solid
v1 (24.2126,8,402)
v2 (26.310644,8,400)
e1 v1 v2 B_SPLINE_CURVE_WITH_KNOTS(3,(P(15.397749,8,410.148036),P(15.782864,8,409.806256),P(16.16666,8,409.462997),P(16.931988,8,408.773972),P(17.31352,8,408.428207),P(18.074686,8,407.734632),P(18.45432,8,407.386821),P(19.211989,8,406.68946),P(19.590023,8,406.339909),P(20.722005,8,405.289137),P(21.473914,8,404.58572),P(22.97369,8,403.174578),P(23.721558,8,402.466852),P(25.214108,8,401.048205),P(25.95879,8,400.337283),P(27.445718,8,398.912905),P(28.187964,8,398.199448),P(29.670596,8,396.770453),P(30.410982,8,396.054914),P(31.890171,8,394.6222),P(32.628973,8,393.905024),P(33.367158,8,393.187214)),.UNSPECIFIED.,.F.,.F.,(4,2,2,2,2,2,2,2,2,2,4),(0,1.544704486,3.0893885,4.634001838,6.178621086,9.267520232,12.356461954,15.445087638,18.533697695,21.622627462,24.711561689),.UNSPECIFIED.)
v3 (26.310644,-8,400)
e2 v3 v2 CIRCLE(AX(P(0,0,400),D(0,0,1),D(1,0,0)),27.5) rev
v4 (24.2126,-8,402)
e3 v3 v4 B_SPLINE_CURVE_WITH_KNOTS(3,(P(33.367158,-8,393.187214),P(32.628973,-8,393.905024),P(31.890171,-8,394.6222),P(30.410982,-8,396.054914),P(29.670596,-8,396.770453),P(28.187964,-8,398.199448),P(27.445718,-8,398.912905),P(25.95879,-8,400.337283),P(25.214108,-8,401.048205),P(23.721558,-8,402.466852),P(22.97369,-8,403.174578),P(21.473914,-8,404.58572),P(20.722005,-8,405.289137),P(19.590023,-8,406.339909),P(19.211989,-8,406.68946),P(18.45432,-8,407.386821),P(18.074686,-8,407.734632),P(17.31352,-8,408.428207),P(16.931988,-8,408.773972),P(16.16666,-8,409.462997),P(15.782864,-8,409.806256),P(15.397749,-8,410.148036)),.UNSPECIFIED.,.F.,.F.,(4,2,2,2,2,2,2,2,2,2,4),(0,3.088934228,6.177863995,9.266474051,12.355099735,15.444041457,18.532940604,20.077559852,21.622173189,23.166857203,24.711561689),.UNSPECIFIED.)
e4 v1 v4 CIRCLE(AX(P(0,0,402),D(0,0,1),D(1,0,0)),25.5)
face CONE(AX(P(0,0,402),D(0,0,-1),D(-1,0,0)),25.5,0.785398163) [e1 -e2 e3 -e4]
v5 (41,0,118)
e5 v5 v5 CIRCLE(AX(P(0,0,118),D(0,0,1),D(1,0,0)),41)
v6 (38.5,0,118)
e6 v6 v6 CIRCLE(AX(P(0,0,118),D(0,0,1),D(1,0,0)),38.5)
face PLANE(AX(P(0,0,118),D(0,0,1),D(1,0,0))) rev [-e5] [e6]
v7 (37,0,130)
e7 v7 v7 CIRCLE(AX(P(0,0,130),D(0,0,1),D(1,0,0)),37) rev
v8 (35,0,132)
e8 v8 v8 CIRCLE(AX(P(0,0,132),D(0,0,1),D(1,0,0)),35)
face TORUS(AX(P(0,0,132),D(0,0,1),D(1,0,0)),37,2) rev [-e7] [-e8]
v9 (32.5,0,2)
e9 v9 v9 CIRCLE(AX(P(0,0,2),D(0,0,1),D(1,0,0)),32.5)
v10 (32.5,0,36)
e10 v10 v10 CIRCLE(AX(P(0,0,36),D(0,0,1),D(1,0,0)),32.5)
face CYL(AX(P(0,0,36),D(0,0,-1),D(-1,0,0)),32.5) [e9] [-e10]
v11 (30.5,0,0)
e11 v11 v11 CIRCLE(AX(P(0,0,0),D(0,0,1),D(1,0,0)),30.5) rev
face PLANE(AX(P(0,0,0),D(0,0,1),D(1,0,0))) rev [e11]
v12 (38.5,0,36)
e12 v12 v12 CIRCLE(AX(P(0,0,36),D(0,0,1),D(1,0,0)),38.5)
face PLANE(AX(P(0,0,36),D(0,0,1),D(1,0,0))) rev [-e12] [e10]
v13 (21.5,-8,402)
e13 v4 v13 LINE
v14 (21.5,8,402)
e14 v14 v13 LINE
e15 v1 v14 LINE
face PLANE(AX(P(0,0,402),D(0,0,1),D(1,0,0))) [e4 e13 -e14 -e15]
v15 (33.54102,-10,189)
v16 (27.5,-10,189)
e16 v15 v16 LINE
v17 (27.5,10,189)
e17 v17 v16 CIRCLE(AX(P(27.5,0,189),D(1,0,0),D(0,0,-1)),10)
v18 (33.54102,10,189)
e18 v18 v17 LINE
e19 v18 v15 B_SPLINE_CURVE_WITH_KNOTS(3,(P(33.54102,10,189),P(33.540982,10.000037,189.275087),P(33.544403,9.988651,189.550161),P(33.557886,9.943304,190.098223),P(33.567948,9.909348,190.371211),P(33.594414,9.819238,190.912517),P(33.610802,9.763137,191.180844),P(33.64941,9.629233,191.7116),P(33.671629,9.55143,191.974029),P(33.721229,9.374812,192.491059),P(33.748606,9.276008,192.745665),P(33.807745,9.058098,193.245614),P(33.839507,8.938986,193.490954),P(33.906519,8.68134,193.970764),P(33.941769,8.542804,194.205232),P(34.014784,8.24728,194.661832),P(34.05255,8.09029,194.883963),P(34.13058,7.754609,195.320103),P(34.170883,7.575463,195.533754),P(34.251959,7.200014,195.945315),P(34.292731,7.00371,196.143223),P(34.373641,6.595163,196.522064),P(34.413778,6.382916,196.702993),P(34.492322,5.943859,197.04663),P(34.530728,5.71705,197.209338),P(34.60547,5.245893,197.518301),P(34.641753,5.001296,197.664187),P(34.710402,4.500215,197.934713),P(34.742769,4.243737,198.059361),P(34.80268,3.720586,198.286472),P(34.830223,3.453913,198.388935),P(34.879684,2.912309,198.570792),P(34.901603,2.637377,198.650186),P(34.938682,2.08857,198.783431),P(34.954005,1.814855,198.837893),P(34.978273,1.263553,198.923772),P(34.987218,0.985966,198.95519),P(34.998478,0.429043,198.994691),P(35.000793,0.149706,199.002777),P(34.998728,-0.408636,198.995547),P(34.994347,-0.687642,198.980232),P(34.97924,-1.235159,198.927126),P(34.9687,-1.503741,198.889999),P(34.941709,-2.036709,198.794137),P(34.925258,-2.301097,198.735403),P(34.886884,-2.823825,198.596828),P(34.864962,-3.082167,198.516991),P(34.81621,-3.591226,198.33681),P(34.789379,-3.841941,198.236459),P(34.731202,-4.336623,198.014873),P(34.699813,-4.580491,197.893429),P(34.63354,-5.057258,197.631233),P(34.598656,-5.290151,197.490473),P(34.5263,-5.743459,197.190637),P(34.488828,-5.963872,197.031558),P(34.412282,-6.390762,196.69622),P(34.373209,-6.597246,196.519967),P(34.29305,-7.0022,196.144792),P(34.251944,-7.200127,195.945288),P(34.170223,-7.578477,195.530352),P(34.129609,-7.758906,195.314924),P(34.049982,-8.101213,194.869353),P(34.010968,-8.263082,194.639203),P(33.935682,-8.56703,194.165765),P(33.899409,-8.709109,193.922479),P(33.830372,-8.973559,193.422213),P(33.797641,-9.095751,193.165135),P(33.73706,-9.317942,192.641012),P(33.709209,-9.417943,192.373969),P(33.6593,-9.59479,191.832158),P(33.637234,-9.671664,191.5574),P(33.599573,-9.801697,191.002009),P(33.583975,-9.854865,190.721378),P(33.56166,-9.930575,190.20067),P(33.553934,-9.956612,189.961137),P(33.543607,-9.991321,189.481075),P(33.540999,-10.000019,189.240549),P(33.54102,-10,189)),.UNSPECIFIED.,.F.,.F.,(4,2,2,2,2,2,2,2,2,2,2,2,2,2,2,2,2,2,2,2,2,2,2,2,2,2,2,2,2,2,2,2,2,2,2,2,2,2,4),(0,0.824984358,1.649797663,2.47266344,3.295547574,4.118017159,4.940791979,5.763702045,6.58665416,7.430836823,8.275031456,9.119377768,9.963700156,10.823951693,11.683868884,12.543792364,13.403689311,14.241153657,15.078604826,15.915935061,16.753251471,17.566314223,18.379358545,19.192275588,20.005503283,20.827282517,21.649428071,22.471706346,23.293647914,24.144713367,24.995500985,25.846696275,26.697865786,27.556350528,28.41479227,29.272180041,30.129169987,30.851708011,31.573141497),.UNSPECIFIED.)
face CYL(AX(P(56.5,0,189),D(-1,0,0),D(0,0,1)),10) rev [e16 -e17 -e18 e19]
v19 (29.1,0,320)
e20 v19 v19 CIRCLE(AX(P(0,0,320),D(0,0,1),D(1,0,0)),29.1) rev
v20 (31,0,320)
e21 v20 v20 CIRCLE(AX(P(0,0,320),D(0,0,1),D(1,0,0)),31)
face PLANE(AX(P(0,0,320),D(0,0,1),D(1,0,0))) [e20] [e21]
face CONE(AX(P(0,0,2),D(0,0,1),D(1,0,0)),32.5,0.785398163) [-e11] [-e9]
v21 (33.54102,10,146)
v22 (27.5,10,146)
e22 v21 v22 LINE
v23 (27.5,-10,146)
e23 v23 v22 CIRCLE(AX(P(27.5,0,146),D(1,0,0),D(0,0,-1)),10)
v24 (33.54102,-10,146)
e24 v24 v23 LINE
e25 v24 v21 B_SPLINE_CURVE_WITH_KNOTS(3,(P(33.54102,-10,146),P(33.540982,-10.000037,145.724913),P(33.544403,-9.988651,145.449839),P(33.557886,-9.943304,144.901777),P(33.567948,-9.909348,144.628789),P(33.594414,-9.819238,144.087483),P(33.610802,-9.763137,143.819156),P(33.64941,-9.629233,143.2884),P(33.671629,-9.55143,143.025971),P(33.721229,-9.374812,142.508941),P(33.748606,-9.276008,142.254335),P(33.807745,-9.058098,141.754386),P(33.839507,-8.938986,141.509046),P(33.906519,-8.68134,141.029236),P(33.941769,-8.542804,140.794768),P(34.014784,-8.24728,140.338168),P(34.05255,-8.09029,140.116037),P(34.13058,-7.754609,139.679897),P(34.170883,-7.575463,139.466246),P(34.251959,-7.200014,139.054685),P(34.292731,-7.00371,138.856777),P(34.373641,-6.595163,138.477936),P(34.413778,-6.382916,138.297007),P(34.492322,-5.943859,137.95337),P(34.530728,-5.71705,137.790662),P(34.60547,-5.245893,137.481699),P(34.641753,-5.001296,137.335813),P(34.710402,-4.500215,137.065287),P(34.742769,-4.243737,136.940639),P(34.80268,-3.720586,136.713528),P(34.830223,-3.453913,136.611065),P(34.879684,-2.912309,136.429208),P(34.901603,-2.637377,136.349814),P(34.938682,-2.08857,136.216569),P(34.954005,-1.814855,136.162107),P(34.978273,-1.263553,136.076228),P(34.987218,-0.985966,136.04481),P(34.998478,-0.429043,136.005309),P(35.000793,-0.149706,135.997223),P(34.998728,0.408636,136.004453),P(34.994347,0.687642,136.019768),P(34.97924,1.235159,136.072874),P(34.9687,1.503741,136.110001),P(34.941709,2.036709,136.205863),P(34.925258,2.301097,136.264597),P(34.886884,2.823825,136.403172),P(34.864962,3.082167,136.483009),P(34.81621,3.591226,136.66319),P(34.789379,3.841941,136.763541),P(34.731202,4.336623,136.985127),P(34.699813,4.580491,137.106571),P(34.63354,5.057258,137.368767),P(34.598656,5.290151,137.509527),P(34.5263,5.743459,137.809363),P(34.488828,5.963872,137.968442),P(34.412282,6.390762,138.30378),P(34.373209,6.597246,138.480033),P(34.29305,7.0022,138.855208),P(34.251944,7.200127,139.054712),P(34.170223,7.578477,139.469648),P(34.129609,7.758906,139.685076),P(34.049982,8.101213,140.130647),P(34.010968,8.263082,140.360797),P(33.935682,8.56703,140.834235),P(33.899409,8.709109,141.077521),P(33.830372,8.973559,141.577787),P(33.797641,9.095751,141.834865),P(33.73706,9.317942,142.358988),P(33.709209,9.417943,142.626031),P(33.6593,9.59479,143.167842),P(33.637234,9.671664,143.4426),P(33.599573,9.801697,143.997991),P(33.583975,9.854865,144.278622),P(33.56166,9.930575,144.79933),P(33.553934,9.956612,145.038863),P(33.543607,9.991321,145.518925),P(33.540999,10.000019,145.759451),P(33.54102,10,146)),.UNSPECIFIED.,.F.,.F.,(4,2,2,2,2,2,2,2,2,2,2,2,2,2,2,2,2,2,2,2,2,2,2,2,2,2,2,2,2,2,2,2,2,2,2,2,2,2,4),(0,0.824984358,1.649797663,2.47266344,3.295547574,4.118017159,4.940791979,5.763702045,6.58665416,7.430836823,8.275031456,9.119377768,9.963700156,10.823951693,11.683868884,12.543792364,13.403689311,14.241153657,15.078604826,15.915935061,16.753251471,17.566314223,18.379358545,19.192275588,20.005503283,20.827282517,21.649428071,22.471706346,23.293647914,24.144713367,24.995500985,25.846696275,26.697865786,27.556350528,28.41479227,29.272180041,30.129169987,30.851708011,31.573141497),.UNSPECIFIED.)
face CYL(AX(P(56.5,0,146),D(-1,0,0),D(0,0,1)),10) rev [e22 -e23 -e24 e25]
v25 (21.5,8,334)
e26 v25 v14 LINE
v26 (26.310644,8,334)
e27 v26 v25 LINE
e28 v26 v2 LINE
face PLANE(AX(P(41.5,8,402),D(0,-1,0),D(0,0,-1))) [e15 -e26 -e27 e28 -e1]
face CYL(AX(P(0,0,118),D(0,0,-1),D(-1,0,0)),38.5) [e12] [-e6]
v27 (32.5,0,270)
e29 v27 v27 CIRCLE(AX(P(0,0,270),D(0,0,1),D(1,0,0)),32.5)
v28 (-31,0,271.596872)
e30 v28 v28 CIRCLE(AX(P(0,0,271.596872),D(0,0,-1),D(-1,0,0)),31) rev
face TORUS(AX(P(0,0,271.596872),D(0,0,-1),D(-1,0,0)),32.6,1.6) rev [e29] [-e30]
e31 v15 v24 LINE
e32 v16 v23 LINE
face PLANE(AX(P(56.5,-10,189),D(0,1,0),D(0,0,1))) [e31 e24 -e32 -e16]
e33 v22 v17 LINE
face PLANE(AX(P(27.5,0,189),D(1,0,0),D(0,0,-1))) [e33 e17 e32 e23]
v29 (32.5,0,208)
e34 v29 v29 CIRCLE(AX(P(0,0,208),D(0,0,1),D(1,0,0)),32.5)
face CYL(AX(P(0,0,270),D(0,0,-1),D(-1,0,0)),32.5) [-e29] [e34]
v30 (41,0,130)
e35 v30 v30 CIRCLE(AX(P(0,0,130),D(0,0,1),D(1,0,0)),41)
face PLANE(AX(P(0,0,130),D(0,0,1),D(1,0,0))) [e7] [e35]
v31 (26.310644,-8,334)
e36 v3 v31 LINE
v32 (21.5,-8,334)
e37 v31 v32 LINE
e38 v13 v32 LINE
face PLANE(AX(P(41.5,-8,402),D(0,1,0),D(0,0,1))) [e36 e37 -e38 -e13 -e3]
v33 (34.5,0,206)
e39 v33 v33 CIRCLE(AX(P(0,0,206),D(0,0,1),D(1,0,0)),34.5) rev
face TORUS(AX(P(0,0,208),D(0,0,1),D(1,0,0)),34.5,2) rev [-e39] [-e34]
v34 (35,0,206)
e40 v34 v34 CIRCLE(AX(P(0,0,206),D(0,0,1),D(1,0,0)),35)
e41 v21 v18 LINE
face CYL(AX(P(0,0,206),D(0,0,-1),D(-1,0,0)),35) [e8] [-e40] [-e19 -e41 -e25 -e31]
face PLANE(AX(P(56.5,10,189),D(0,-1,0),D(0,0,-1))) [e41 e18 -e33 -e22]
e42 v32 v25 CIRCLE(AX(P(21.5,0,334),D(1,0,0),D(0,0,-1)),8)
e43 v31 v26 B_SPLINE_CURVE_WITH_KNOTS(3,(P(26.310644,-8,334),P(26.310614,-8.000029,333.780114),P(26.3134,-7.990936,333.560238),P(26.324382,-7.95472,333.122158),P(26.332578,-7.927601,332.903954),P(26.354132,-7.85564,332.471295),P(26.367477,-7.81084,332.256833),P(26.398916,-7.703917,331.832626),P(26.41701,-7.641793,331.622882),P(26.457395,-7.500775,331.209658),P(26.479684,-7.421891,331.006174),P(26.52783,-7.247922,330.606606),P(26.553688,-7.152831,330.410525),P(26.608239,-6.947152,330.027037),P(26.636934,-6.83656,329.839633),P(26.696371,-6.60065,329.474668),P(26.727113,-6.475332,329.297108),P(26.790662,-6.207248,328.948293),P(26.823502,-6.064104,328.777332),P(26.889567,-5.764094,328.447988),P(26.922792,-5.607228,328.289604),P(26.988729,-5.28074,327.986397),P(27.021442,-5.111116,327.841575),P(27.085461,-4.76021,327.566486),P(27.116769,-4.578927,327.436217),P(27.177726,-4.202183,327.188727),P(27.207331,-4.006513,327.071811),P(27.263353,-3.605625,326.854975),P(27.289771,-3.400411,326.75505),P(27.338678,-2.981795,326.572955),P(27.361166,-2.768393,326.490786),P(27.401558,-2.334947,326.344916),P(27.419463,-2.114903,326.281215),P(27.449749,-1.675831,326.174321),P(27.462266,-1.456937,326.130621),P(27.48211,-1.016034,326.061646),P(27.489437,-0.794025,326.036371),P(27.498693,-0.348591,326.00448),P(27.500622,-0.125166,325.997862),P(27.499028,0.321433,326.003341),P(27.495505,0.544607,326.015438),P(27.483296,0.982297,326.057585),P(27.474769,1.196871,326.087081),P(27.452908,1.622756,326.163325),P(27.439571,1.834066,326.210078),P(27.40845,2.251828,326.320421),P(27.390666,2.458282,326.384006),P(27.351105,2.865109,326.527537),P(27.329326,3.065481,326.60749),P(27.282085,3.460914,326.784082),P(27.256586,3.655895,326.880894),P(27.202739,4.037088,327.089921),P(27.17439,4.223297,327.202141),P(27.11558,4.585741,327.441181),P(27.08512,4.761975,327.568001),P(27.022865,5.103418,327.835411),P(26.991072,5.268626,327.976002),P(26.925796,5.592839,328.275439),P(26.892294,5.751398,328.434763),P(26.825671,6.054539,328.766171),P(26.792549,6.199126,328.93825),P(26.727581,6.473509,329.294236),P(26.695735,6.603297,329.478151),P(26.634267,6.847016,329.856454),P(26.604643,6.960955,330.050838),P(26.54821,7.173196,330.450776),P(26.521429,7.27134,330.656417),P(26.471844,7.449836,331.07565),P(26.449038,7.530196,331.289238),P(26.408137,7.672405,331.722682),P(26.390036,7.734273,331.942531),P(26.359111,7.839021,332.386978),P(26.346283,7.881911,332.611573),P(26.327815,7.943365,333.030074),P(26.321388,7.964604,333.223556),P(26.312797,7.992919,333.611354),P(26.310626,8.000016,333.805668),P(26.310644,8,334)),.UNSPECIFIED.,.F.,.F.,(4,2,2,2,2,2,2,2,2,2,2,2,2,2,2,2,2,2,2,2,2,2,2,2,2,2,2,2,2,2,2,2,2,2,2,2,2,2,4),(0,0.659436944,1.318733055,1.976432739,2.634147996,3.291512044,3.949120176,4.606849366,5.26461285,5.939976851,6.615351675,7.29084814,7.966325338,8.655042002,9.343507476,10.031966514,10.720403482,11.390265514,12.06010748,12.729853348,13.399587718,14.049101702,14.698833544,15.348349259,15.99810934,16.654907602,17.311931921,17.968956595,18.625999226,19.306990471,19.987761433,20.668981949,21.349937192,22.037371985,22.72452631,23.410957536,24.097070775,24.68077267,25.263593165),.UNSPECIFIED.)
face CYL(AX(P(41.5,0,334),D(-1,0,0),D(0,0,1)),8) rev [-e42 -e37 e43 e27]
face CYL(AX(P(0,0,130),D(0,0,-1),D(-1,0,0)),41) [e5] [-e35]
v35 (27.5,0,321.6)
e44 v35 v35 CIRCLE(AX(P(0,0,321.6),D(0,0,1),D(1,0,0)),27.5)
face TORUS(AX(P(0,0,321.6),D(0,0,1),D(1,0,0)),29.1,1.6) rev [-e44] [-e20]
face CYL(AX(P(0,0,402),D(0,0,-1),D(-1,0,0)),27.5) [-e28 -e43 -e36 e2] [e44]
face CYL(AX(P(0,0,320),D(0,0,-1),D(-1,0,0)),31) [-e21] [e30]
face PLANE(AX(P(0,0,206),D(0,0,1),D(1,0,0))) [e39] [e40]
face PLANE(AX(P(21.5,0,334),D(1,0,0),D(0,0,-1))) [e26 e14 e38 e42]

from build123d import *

# Parameters (mm, degrees)
SKETCH_1_R          = 32.5
EXTRUDE_1_DEPTH     = 36
SKETCH_2_R          = 38.5
EXTRUDE_2_DEPTH     = 82
SKETCH_3_R          = 41
EXTRUDE_3_DEPTH     = 12
SKETCH_4_R          = 35
EXTRUDE_4_DEPTH     = 76
SKETCH_5_R          = 32.5
EXTRUDE_5_DEPTH     = 64
SKETCH_6_R          = 31
EXTRUDE_6_DEPTH     = 50
SKETCH_7_R          = 27.5
EXTRUDE_7_DEPTH     = 82
FILLET_1_R          = 2
FILLET_2_R          = 1.6
CHAMFER_1_SIZE      = 2
CUT_EXTRUDE_1_DEPTH = 29
CUT_EXTRUDE_2_DEPTH = 20


with BuildPart() as part:
    # 草图1 → 凸台-拉伸1 (new body)
    with BuildSketch(Plane.XY):
        Circle(SKETCH_1_R)
    extrude(amount=EXTRUDE_1_DEPTH)

    # 草图2 → 凸台-拉伸2 (add)
    with BuildSketch(Plane.XY.offset(36)):
        Circle(SKETCH_2_R)
    extrude(amount=EXTRUDE_2_DEPTH)

    # 草图3 → 凸台-拉伸3 (add)
    with BuildSketch(Plane.XY.offset(118)):
        Circle(SKETCH_3_R)
    extrude(amount=EXTRUDE_3_DEPTH)

    # 草图4 → 凸台-拉伸4 (add)
    with BuildSketch(Plane.XY.offset(130)):
        Circle(SKETCH_4_R)
    extrude(amount=EXTRUDE_4_DEPTH)

    # 草图5 → 凸台-拉伸5 (add)
    with BuildSketch(Plane.XY.offset(206)):
        Circle(SKETCH_5_R)
    extrude(amount=EXTRUDE_5_DEPTH)

    # 草图6 → 凸台-拉伸6 (add)
    with BuildSketch(Plane.XY.offset(270)):
        Circle(SKETCH_6_R)
    extrude(amount=EXTRUDE_6_DEPTH)

    # 草图7 → 凸台-拉伸7 (add)
    with BuildSketch(Plane.XY.offset(320)):
        Circle(SKETCH_7_R)
    extrude(amount=EXTRUDE_7_DEPTH)

    # 圆角1
    fillet_1_edges = [part.edges().sort_by_distance(p)[0] for p in [
        (-35, 0, 130),
        (-32.5, 0, 206),
    ]]
    fillet(fillet_1_edges, radius=FILLET_1_R)

    # 圆角2
    # the kernel refuses this fillet: 1.6 mm, written as the material it adds along each edge
    with BuildSketch(Plane(origin=(0, 0, 270), x_dir=(1, 0, 0), z_dir=(0, -1, 0))) as fillet_2_piece_1:
        with BuildLine():
            CenterArc((32.6, 1.596871942), FILLET_2_R, 180, 86.416678302)
            Line((31, 1.596871942), (30.968, 1.596871942))
            Line((30.968, 1.596871942), (30.968, 0))
            Line((30.968, 0), (31, -0.032))
            ThreePointArc((31, -0.032), (31.75, -0.032), (32.498, -0.031937439))
            Line((32.498, -0.031937439), (32.5, 0))
        make_face()
    revolve(axis=Axis((0, 0, 270), (0, 0, 1)))
    with BuildSketch(Plane(origin=(0, 0, 320), x_dir=(1, 0, 0), z_dir=(0, -1, 0))) as fillet_2_piece_2:
        with BuildLine():
            CenterArc((27.5 + FILLET_2_R, FILLET_2_R), FILLET_2_R, 180, 90)
            Line((27.5, FILLET_2_R), (27.5 - FILLET_2_R * 0.02, FILLET_2_R))
            Line((27.5 - FILLET_2_R * 0.02, FILLET_2_R), (27.5 - FILLET_2_R * 0.02, -FILLET_2_R * 0.02))
            Line((27.5 - FILLET_2_R * 0.02, -FILLET_2_R * 0.02), (27.5 + FILLET_2_R, -FILLET_2_R * 0.02))
            Line((27.5 + FILLET_2_R, -FILLET_2_R * 0.02), (27.5 + FILLET_2_R, 0))
        make_face()
    revolve(axis=Axis((0, 0, 320), (0, 0, 1)))

    # 倒角1
    chamfer_1_edges = [part.edges().sort_by_distance(p)[0] for p in [
        (-32.5, 0, 0),
        (-27.5, 0, 402),
    ]]
    chamfer(chamfer_1_edges, length=CHAMFER_1_SIZE)

    # 草图8 → 切除-拉伸1 (cut)
    with BuildSketch(Plane(origin=(27.5, 0, 0), x_dir=(0, 0, -1), z_dir=(1, 0, 0))):
        with BuildLine():
            Line((-189, 10), (-146, 10))
            ThreePointArc((-146, 10), (-136, 0), (-146, -10))
            Line((-146, -10), (-189, -10))
            ThreePointArc((-189, -10), (-199, 0), (-189, 10))
        make_face()
    extrude(amount=CUT_EXTRUDE_1_DEPTH, mode=Mode.SUBTRACT)

    # 草图9 → 切除-拉伸2 (cut)
    with BuildSketch(Plane(origin=(21.5, 0, 0), x_dir=(0, 0, -1), z_dir=(1, 0, 0))):
        with BuildLine():
            Line((-402, 8), (-334, 8))
            ThreePointArc((-334, 8), (-326, 0), (-334, -8))
            Line((-334, -8), (-402, -8))
            Line((-402, -8), (-402, 8))
        make_face()
    extrude(amount=CUT_EXTRUDE_2_DEPTH, mode=Mode.SUBTRACT)


solid = part.part
